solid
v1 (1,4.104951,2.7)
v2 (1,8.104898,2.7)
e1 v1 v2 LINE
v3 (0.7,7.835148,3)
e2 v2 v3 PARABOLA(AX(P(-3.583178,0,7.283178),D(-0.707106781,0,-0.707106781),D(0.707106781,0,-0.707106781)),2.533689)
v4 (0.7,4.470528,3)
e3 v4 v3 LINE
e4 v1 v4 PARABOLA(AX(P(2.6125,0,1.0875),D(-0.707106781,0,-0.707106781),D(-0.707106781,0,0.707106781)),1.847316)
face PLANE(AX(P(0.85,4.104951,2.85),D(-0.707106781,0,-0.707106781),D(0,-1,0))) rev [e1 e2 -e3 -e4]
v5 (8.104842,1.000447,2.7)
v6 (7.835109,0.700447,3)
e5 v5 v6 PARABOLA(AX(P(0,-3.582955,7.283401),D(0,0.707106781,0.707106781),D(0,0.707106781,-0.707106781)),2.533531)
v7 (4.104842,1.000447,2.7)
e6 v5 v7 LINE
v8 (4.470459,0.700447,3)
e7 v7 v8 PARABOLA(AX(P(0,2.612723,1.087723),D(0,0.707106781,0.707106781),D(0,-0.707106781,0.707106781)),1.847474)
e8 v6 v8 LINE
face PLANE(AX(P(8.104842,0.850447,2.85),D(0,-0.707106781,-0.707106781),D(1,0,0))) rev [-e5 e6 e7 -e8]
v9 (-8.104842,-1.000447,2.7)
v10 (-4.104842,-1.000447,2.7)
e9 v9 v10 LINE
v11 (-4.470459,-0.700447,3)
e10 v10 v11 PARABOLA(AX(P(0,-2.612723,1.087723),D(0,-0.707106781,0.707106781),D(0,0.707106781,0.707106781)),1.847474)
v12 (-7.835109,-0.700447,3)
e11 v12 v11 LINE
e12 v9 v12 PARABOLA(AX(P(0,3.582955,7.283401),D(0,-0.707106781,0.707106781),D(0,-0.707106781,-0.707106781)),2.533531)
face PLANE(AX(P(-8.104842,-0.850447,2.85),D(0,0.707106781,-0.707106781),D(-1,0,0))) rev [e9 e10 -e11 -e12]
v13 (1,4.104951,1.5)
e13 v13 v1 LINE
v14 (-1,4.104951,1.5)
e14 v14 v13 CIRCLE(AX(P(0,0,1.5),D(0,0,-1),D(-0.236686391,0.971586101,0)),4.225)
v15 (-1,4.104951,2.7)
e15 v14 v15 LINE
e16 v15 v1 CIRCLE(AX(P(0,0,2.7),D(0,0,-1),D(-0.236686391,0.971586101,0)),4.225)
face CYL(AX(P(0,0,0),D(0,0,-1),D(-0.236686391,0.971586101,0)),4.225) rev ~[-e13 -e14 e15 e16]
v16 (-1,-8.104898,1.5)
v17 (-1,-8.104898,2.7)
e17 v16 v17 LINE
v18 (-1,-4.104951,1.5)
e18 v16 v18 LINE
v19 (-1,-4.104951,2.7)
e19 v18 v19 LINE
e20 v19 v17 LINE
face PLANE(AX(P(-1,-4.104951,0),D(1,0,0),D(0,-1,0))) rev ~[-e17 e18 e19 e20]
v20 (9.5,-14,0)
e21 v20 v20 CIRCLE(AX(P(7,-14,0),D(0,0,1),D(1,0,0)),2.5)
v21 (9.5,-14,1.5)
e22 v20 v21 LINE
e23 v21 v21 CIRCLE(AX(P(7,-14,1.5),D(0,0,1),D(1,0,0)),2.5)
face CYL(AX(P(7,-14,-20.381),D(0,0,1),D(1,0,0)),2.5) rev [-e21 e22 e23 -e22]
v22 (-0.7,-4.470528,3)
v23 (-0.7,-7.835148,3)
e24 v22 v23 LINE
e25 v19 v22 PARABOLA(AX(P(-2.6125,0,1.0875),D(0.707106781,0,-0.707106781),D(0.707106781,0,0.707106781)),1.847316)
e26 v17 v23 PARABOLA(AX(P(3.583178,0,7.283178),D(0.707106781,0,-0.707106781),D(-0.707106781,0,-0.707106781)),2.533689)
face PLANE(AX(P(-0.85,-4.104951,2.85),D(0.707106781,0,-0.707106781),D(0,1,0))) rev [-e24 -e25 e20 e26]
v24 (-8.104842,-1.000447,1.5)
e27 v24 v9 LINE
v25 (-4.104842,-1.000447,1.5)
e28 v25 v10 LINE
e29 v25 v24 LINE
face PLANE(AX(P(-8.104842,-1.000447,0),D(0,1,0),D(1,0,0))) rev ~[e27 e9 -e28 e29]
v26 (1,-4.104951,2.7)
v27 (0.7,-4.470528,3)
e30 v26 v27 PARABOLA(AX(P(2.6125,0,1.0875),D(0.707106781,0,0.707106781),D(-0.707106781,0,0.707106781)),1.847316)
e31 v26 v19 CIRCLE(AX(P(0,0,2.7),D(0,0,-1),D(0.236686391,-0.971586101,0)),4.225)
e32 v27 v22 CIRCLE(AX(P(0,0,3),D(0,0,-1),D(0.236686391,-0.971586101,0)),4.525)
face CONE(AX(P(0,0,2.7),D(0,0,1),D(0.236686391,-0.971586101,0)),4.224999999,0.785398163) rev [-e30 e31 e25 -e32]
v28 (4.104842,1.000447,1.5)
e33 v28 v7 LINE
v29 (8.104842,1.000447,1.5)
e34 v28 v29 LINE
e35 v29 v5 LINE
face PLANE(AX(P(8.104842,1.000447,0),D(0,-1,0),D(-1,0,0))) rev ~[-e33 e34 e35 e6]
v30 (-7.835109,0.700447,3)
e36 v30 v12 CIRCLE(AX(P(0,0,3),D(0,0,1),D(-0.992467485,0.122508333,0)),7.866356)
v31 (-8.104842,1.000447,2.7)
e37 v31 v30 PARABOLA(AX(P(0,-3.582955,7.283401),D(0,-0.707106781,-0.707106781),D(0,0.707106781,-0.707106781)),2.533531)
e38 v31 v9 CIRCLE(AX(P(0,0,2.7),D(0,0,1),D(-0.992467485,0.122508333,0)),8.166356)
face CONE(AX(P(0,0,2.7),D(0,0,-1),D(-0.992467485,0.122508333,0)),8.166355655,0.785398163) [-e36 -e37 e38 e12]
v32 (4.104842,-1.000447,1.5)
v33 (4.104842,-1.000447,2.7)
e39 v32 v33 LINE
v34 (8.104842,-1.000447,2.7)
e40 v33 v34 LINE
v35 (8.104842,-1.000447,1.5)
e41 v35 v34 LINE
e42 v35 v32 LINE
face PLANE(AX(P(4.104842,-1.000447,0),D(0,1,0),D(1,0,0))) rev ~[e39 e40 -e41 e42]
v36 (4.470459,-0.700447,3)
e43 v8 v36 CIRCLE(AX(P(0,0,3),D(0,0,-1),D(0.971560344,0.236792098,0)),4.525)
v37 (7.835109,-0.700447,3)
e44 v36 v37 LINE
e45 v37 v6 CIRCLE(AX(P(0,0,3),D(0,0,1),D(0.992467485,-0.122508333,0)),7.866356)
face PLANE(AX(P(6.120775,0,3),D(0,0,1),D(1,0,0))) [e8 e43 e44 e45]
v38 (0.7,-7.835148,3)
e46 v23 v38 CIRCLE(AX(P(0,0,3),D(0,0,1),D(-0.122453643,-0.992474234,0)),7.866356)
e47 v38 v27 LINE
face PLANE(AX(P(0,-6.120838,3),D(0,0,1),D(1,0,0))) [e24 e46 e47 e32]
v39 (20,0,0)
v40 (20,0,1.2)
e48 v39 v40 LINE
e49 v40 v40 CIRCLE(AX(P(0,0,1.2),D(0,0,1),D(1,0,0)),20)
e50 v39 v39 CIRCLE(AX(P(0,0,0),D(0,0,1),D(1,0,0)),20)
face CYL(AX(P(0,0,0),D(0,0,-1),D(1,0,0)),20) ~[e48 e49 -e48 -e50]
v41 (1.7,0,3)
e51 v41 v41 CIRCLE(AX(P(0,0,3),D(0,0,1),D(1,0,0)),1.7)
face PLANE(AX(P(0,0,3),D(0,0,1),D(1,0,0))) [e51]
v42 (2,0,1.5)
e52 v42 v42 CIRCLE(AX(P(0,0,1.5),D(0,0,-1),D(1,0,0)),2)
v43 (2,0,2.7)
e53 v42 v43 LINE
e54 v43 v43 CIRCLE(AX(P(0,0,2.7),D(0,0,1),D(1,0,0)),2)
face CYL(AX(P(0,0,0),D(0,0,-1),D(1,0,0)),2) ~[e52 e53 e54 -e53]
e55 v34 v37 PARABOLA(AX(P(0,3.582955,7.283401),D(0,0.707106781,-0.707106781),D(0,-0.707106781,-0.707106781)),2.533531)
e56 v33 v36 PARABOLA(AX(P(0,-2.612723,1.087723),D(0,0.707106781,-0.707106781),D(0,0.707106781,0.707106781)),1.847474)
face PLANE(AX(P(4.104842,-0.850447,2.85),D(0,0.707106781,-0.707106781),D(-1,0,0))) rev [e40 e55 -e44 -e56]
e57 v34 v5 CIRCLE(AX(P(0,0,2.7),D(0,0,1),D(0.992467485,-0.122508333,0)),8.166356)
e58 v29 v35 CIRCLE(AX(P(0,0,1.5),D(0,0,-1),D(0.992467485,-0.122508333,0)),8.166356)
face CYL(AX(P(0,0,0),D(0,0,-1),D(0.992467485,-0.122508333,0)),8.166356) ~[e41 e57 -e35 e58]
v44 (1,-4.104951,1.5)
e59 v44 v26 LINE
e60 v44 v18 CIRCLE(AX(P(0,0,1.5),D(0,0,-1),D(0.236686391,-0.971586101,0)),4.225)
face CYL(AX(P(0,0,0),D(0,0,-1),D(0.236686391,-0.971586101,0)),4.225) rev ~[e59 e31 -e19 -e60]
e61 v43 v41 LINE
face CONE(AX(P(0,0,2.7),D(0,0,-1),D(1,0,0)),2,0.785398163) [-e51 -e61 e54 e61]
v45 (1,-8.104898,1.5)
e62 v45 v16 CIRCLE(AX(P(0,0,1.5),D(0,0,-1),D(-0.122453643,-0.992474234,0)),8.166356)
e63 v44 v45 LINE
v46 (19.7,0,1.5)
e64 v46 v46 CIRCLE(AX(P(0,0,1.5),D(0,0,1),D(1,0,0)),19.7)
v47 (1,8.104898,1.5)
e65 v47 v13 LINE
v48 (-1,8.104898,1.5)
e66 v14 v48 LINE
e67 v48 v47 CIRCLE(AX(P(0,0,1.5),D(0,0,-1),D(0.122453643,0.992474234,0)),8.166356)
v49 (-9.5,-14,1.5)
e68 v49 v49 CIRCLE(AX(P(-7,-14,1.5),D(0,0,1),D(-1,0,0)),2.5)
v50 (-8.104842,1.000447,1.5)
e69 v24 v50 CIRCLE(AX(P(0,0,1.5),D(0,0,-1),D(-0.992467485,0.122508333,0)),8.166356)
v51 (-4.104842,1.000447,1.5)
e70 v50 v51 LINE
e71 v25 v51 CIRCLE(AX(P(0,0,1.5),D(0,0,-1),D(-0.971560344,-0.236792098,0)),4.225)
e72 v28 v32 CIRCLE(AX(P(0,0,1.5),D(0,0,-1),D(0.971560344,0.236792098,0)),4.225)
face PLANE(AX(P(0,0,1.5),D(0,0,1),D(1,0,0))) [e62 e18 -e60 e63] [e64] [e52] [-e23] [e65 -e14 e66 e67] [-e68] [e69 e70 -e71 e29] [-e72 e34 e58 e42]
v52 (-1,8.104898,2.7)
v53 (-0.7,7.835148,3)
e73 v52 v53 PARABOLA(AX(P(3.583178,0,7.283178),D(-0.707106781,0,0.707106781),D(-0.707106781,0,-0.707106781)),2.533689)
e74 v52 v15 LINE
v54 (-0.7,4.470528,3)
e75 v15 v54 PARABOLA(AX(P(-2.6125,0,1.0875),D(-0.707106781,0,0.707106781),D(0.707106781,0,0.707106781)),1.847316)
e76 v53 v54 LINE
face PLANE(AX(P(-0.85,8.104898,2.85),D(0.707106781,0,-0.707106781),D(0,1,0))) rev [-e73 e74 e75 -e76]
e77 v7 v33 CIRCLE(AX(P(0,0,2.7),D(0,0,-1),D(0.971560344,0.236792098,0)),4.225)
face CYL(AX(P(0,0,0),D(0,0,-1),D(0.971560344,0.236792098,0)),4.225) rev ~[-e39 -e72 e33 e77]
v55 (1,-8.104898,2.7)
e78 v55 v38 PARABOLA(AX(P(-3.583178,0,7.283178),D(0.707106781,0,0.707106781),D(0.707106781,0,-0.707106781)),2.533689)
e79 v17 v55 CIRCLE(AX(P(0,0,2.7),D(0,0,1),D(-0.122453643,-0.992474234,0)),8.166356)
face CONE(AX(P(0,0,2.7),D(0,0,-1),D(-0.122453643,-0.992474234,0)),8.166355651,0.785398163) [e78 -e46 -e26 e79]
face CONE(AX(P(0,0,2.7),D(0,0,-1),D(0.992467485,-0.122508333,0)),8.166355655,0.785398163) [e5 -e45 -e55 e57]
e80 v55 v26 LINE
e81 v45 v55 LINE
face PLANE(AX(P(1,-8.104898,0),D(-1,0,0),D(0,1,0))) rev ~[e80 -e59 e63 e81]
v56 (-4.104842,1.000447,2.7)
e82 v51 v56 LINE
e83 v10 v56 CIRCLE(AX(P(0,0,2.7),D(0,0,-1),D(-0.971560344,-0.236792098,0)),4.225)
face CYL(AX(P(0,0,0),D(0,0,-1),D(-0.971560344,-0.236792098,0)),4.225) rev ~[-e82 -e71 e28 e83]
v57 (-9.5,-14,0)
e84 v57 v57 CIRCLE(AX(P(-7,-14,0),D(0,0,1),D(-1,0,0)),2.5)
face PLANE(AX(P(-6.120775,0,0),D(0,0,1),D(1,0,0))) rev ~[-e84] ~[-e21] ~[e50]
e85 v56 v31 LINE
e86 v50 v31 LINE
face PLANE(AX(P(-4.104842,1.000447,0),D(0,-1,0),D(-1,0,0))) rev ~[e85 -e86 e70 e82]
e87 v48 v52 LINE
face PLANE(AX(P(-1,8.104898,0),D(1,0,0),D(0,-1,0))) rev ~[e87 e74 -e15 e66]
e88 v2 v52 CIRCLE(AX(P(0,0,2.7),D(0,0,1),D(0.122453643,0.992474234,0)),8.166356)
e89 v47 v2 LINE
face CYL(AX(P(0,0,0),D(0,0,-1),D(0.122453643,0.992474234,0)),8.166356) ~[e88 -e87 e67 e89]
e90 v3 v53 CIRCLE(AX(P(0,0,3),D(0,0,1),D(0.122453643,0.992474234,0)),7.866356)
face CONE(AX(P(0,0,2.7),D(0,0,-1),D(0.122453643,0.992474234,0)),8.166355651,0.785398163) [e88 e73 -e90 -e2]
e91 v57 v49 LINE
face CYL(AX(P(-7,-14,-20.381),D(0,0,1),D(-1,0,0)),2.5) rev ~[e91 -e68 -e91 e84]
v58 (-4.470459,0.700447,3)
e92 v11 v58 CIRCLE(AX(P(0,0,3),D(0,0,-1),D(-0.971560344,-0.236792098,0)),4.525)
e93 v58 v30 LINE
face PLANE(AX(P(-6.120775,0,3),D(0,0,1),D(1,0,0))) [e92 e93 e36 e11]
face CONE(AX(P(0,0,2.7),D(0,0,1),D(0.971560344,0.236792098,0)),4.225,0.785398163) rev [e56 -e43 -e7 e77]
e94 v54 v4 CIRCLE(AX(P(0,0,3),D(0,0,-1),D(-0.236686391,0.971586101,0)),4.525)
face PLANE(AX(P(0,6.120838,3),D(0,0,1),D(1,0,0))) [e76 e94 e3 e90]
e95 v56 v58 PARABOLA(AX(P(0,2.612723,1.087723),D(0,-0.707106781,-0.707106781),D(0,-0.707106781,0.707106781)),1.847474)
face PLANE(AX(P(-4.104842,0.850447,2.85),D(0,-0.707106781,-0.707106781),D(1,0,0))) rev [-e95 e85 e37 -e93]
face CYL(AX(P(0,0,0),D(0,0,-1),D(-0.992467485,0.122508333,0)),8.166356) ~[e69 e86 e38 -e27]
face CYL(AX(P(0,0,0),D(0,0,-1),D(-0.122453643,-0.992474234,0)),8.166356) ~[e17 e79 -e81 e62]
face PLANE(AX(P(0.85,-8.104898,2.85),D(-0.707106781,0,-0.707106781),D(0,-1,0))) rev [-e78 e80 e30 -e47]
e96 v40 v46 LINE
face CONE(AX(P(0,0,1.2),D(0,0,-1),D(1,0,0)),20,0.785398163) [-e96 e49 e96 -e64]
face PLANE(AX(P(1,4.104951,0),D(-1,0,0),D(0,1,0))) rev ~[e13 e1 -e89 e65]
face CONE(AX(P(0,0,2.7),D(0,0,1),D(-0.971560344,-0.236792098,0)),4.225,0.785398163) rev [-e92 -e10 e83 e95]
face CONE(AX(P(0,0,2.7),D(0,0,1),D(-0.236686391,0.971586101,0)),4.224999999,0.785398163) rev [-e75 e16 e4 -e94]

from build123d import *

# Parameters (mm, degrees)
F0_R     = 20
F1_DEPTH = 1.5
F2_D     = 5
F2_DEPTH = 20.381
F2_TIP   = 1.5021515476
F3_R     = 2
F4_DEPTH = 3
F5_SIZE  = 0.3


# Not quite as in the source:
# - a pattern or mirror of a feature is missing from the dataset's text; its kind, count and spacing are read off the source's solid


with BuildPart() as f1:
    # F0 (on Top) → F1 (new body)
    with BuildSketch(Plane.XY):
        Circle(F0_R)
    extrude(amount=F1_DEPTH)

    # F2
    with Locations(Plane(origin=(0, 0, 0), x_dir=(1, 0, 0), z_dir=(0, 0, -1))):
        with Locations((-7, 14)):
            f2 = Hole(F2_D / 2, depth=F2_DEPTH)
            with Locations((0, 0, -(F2_DEPTH + F2_TIP / 2))):  # 118° drill point
                Cone(0, F2_D / 2, F2_TIP, mode=Mode.SUBTRACT)

    # F2_copies: F2 across plane
    add(f2.mirror(Plane(origin=(0, 0, 0), x_dir=(0, 0, 1), z_dir=(1, 0, 0))), mode=Mode.SUBTRACT)

    # F3 (on Top) → F4 (join)
    with BuildSketch(Plane.XY):
        with BuildLine():
            Line((-4.104842454, 1.0004466142), (-8.104842454, 1.0004466142))
            ThreePointArc((-8.104842454, 1.0004466142), (-8.1663556518, 0), (-8.104842454, -1.0004466142))
            Line((-8.104842454, -1.0004466142), (-4.104842454, -1.0004466142))
            ThreePointArc((-4.104842454, -1.0004466142), (-4.225, 0), (-4.104842454, 1.0004466142))
        make_face()
        with BuildLine():
            ThreePointArc((1, 8.1048975707), (0, 8.1663556518), (-1, 8.1048975707))
            Line((-1, 8.1048975707), (-1, 4.1049512786))
            ThreePointArc((-1, 4.1049512786), (0, 4.225), (1, 4.1049512786))
            Line((1, 4.1049512786), (1, 8.1048975707))
        make_face()
        with BuildLine():
            Line((4.104842454, -1.0004466142), (8.104842454, -1.0004466142))
            ThreePointArc((8.104842454, -1.0004466142), (8.1663556518, 0), (8.104842454, 1.0004466142))
            Line((8.104842454, 1.0004466142), (4.104842454, 1.0004466142))
            ThreePointArc((4.104842454, 1.0004466142), (4.225, 0), (4.104842454, -1.0004466142))
        make_face()
        with BuildLine():
            ThreePointArc((-1, -8.1048975707), (0, -8.1663556518), (1, -8.1048975707))
            Line((1, -8.1048975707), (1, -4.1049512786))
            ThreePointArc((1, -4.1049512786), (0, -4.225), (-1, -4.1049512786))
            Line((-1, -4.1049512786), (-1, -8.1048975707))
        make_face()
        Circle(F3_R)
    extrude(amount=F4_DEPTH)

    # F5
    f5_edges = [f1.edges().sort_by_distance(p)[0] for p in [
        (-2, 0, 3),
        (0, 8.166356, 3),
        (-1, 6.104924, 3),
        (0, 4.225, 3),
        (1, 6.104924, 3),
        (6.104842, -1.000447, 3),
        (8.166356, 0, 3),
        (6.104842, 1.000447, 3),
        (4.225, 0, 3),
        (1, -6.104924, 3),
        (0, -4.225, 3),
        (-1, -6.104924, 3),
        (0, -8.166356, 3),
        (-6.104842, 1.000447, 3),
        (-8.166356, 0, 3),
        (-6.104842, -1.000447, 3),
        (-4.225, 0, 3),
        (-20, 0, 1.5),
    ]]
    chamfer(f5_edges, length=F5_SIZE)


solid = f1.part
